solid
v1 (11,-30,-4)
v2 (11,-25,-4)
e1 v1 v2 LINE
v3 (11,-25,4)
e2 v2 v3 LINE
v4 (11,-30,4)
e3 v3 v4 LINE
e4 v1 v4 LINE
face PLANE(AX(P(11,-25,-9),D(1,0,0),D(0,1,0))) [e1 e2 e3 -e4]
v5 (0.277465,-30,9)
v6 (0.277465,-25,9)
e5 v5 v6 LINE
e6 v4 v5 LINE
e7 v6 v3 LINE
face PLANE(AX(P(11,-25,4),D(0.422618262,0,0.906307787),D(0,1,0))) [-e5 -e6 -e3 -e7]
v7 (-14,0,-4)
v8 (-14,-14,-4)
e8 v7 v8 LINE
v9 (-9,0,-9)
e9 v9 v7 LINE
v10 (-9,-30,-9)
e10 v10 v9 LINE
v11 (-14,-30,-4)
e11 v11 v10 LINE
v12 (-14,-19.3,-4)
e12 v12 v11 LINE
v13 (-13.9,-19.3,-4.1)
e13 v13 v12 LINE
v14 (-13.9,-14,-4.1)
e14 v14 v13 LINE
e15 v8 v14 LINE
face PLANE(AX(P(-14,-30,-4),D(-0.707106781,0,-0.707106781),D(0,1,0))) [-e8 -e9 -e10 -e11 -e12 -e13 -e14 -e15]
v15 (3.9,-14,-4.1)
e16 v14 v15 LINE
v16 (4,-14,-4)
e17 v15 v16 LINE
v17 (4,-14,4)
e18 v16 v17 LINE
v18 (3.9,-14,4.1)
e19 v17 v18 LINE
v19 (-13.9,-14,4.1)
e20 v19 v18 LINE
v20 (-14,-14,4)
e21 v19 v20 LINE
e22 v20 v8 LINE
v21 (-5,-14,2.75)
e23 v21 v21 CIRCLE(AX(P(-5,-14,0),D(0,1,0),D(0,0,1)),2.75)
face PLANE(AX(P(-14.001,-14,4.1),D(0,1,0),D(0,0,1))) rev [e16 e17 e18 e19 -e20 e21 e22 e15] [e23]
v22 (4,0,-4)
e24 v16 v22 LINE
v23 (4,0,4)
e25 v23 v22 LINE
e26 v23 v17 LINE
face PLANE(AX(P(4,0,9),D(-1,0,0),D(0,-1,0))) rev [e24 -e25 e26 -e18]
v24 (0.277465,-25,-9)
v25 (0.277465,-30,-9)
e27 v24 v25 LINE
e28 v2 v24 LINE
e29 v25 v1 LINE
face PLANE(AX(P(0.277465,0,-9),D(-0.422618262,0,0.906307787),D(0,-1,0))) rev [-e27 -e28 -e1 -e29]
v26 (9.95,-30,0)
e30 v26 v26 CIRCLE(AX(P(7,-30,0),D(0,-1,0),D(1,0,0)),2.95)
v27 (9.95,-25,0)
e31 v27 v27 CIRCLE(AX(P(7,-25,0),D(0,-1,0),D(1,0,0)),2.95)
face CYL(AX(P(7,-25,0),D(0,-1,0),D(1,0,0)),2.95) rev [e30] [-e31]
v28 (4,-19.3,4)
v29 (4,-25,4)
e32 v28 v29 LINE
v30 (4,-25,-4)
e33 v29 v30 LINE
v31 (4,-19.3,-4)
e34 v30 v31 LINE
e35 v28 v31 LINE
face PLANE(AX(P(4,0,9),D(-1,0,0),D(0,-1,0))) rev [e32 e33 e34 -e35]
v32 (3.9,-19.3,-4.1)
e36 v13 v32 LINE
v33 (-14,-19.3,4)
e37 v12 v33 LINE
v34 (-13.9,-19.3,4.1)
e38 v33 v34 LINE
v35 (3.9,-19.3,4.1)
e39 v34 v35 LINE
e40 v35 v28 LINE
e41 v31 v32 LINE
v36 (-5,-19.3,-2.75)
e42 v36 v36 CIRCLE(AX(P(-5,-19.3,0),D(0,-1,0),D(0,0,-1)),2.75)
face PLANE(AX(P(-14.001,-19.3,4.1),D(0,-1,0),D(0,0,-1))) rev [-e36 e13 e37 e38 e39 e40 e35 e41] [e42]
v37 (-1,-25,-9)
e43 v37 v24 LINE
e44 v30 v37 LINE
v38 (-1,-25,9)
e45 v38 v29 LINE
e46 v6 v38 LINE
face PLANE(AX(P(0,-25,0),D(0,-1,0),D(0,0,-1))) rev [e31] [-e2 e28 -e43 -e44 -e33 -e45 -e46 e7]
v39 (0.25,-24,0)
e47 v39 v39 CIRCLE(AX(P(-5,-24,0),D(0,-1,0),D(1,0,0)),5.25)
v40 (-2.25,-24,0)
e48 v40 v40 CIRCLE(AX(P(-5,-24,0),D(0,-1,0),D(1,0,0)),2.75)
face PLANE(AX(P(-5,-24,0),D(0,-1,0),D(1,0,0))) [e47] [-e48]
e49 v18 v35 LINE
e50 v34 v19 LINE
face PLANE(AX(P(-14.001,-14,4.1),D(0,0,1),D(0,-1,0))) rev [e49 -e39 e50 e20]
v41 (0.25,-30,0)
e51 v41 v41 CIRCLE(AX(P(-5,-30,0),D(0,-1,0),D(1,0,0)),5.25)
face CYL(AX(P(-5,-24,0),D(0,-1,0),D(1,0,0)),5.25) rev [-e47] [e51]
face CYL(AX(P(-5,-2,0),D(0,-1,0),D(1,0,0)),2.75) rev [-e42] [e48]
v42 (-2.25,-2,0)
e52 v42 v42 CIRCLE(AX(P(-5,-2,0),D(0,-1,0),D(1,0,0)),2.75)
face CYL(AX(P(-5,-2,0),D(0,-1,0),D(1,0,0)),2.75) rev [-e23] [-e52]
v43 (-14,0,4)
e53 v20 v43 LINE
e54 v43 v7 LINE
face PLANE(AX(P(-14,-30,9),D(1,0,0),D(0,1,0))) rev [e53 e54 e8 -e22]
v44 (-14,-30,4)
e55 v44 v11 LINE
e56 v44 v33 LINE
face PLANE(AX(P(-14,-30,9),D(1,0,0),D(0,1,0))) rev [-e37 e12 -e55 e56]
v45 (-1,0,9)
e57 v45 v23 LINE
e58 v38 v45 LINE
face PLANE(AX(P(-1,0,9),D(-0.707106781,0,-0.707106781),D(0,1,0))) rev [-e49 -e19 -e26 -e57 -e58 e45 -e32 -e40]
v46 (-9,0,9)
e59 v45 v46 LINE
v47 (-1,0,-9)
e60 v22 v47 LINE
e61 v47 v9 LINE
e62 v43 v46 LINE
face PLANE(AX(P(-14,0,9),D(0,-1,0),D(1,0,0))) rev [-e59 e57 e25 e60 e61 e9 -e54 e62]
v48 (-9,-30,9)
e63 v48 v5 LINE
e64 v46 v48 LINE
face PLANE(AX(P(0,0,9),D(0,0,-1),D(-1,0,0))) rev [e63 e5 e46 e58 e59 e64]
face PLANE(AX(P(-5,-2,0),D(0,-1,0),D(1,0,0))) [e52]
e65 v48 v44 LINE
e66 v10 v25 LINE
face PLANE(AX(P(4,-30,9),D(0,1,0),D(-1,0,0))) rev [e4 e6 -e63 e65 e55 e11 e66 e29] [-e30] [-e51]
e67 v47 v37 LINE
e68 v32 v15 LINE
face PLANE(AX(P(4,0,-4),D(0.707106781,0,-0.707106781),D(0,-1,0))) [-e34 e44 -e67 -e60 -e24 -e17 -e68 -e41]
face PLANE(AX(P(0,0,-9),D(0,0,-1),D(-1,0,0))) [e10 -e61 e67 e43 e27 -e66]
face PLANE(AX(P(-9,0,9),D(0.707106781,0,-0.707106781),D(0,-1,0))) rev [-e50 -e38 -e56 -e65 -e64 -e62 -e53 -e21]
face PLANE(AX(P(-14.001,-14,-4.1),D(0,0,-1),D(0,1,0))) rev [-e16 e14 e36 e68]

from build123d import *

# Parameters (mm, degrees)
SKETCH1_W           = 18
SKETCH1_H           = 30
BOSS_EXTRUDE1_DEPTH = 9
SKETCH2_R           = 5.25
CUT_EXTRUDE1_DEPTH  = 6
SKETCH4_R           = 2.75
CUT_EXTRUDE3_DEPTH  = 28
CUT_EXTRUDE4_REACH  = 38.125
SKETCH5_W           = 8.2
SKETCH5_H           = 5.3
CHAMFER3_SIZE       = 5
SKETCH6_R           = 2.95
BOSS_EXTRUDE2_DEPTH = 5
CHAMFER4_SIZE       = 5
CHAMFER4_SIZE2      = 10.722534603


with BuildPart() as part:
    # Sketch1 → Boss-Extrude1 (new, symmetric)
    with BuildSketch(Plane.XY):
        with Locations((-5, -15)):
            Rectangle(SKETCH1_W, SKETCH1_H)
    extrude(amount=BOSS_EXTRUDE1_DEPTH, both=True)

    # Sketch2 → Cut-Extrude1 (cut)
    with BuildSketch(Plane.XZ.offset(30)):
        with Locations((-5, 0)):
            Circle(SKETCH2_R)
    extrude(amount=-CUT_EXTRUDE1_DEPTH, mode=Mode.SUBTRACT)

    # Sketch4 → Cut-Extrude3 (cut)
    with BuildSketch(Plane.XZ.offset(30)):
        with Locations((-5, 0)):
            Circle(SKETCH4_R)
    extrude(amount=-CUT_EXTRUDE3_DEPTH, mode=Mode.SUBTRACT)

    # Sketch5 → Cut-Extrude4 (cut, up to next)
    with BuildSketch(Plane(origin=(4, 0, 0), x_dir=(0, 0, -1), z_dir=(1, 0, 0)), mode=Mode.PRIVATE) as cut_extrude4_sk1:
        with Locations((0, -16.65)):
            Rectangle(SKETCH5_W, SKETCH5_H)
    cut_extrude4_tool1 = extrude(cut_extrude4_sk1.sketch, amount=-CUT_EXTRUDE4_REACH, mode=Mode.PRIVATE) & part.part
    add(cut_extrude4_tool1.solids().sort_by_distance((4, -16.65, 0))[0], mode=Mode.SUBTRACT)

    # Chamfer3
    # the kernel refuses this chamfer: 5 mm, written as the material it takes off along each edge
    with BuildSketch(Plane(origin=(-14, -42.85841494, 9), x_dir=(0.9996219169112968, 0, 0.027495876610586317), z_dir=(0, 1, 0)), Plane(origin=(4, 12.85841494, -9), x_dir=(0.027495876610586317, 0, 0.9996219169112968), z_dir=(0, -1, 0))) as chamfer3_piece_1:
        Polygon((CHAMFER3_SIZE * 0.999621916911, CHAMFER3_SIZE * 0.0274958766106), (-CHAMFER3_SIZE * 0.0274958766106, CHAMFER3_SIZE * 0.999621916911), (0, 0), align=None)
    extrude(amount=55.71682988, mode=Mode.SUBTRACT)
    with BuildSketch(Plane(origin=(-14, -42.85841494, -9), x_dir=(0.9996219169112968, 0, -0.027495876610586317), z_dir=(0, 1, 0)), Plane(origin=(4, 12.85841494, 9), x_dir=(0.027495876610586317, 0, -0.9996219169112968), z_dir=(0, -1, 0))) as chamfer3_piece_2:
        Polygon((CHAMFER3_SIZE * 0.999621916911, -CHAMFER3_SIZE * 0.0274958766106), (-CHAMFER3_SIZE * 0.0274958766106, -CHAMFER3_SIZE * 0.999621916911), (0, 0), align=None)
    extrude(amount=55.71682988, mode=Mode.SUBTRACT)

    # Sketch6 → Boss-Extrude2 (add)
    with BuildSketch(Plane.XZ.offset(30)):
        Polygon((-1, -9), (11, -9), (11, 9), (-1, 9), (4, 4), (4, -4), align=None)
        with Locations((7, 0)):
            Circle(SKETCH6_R, mode=Mode.SUBTRACT)
    extrude(amount=-BOSS_EXTRUDE2_DEPTH)

    # Chamfer4
    chamfer4_edges = [part.edges().sort_by_distance(p)[0] for p in [
        (11, -27.5, 9),
        (11, -27.5, -9),
    ]]
    chamfer4_side = [part.faces().sort_by_distance(p)[0] for p in [
        (11, -27.5, 0),
    ]]
    chamfer(chamfer4_edges, length=CHAMFER4_SIZE, length2=CHAMFER4_SIZE2, reference=chamfer4_side[0])


solid = part.part
